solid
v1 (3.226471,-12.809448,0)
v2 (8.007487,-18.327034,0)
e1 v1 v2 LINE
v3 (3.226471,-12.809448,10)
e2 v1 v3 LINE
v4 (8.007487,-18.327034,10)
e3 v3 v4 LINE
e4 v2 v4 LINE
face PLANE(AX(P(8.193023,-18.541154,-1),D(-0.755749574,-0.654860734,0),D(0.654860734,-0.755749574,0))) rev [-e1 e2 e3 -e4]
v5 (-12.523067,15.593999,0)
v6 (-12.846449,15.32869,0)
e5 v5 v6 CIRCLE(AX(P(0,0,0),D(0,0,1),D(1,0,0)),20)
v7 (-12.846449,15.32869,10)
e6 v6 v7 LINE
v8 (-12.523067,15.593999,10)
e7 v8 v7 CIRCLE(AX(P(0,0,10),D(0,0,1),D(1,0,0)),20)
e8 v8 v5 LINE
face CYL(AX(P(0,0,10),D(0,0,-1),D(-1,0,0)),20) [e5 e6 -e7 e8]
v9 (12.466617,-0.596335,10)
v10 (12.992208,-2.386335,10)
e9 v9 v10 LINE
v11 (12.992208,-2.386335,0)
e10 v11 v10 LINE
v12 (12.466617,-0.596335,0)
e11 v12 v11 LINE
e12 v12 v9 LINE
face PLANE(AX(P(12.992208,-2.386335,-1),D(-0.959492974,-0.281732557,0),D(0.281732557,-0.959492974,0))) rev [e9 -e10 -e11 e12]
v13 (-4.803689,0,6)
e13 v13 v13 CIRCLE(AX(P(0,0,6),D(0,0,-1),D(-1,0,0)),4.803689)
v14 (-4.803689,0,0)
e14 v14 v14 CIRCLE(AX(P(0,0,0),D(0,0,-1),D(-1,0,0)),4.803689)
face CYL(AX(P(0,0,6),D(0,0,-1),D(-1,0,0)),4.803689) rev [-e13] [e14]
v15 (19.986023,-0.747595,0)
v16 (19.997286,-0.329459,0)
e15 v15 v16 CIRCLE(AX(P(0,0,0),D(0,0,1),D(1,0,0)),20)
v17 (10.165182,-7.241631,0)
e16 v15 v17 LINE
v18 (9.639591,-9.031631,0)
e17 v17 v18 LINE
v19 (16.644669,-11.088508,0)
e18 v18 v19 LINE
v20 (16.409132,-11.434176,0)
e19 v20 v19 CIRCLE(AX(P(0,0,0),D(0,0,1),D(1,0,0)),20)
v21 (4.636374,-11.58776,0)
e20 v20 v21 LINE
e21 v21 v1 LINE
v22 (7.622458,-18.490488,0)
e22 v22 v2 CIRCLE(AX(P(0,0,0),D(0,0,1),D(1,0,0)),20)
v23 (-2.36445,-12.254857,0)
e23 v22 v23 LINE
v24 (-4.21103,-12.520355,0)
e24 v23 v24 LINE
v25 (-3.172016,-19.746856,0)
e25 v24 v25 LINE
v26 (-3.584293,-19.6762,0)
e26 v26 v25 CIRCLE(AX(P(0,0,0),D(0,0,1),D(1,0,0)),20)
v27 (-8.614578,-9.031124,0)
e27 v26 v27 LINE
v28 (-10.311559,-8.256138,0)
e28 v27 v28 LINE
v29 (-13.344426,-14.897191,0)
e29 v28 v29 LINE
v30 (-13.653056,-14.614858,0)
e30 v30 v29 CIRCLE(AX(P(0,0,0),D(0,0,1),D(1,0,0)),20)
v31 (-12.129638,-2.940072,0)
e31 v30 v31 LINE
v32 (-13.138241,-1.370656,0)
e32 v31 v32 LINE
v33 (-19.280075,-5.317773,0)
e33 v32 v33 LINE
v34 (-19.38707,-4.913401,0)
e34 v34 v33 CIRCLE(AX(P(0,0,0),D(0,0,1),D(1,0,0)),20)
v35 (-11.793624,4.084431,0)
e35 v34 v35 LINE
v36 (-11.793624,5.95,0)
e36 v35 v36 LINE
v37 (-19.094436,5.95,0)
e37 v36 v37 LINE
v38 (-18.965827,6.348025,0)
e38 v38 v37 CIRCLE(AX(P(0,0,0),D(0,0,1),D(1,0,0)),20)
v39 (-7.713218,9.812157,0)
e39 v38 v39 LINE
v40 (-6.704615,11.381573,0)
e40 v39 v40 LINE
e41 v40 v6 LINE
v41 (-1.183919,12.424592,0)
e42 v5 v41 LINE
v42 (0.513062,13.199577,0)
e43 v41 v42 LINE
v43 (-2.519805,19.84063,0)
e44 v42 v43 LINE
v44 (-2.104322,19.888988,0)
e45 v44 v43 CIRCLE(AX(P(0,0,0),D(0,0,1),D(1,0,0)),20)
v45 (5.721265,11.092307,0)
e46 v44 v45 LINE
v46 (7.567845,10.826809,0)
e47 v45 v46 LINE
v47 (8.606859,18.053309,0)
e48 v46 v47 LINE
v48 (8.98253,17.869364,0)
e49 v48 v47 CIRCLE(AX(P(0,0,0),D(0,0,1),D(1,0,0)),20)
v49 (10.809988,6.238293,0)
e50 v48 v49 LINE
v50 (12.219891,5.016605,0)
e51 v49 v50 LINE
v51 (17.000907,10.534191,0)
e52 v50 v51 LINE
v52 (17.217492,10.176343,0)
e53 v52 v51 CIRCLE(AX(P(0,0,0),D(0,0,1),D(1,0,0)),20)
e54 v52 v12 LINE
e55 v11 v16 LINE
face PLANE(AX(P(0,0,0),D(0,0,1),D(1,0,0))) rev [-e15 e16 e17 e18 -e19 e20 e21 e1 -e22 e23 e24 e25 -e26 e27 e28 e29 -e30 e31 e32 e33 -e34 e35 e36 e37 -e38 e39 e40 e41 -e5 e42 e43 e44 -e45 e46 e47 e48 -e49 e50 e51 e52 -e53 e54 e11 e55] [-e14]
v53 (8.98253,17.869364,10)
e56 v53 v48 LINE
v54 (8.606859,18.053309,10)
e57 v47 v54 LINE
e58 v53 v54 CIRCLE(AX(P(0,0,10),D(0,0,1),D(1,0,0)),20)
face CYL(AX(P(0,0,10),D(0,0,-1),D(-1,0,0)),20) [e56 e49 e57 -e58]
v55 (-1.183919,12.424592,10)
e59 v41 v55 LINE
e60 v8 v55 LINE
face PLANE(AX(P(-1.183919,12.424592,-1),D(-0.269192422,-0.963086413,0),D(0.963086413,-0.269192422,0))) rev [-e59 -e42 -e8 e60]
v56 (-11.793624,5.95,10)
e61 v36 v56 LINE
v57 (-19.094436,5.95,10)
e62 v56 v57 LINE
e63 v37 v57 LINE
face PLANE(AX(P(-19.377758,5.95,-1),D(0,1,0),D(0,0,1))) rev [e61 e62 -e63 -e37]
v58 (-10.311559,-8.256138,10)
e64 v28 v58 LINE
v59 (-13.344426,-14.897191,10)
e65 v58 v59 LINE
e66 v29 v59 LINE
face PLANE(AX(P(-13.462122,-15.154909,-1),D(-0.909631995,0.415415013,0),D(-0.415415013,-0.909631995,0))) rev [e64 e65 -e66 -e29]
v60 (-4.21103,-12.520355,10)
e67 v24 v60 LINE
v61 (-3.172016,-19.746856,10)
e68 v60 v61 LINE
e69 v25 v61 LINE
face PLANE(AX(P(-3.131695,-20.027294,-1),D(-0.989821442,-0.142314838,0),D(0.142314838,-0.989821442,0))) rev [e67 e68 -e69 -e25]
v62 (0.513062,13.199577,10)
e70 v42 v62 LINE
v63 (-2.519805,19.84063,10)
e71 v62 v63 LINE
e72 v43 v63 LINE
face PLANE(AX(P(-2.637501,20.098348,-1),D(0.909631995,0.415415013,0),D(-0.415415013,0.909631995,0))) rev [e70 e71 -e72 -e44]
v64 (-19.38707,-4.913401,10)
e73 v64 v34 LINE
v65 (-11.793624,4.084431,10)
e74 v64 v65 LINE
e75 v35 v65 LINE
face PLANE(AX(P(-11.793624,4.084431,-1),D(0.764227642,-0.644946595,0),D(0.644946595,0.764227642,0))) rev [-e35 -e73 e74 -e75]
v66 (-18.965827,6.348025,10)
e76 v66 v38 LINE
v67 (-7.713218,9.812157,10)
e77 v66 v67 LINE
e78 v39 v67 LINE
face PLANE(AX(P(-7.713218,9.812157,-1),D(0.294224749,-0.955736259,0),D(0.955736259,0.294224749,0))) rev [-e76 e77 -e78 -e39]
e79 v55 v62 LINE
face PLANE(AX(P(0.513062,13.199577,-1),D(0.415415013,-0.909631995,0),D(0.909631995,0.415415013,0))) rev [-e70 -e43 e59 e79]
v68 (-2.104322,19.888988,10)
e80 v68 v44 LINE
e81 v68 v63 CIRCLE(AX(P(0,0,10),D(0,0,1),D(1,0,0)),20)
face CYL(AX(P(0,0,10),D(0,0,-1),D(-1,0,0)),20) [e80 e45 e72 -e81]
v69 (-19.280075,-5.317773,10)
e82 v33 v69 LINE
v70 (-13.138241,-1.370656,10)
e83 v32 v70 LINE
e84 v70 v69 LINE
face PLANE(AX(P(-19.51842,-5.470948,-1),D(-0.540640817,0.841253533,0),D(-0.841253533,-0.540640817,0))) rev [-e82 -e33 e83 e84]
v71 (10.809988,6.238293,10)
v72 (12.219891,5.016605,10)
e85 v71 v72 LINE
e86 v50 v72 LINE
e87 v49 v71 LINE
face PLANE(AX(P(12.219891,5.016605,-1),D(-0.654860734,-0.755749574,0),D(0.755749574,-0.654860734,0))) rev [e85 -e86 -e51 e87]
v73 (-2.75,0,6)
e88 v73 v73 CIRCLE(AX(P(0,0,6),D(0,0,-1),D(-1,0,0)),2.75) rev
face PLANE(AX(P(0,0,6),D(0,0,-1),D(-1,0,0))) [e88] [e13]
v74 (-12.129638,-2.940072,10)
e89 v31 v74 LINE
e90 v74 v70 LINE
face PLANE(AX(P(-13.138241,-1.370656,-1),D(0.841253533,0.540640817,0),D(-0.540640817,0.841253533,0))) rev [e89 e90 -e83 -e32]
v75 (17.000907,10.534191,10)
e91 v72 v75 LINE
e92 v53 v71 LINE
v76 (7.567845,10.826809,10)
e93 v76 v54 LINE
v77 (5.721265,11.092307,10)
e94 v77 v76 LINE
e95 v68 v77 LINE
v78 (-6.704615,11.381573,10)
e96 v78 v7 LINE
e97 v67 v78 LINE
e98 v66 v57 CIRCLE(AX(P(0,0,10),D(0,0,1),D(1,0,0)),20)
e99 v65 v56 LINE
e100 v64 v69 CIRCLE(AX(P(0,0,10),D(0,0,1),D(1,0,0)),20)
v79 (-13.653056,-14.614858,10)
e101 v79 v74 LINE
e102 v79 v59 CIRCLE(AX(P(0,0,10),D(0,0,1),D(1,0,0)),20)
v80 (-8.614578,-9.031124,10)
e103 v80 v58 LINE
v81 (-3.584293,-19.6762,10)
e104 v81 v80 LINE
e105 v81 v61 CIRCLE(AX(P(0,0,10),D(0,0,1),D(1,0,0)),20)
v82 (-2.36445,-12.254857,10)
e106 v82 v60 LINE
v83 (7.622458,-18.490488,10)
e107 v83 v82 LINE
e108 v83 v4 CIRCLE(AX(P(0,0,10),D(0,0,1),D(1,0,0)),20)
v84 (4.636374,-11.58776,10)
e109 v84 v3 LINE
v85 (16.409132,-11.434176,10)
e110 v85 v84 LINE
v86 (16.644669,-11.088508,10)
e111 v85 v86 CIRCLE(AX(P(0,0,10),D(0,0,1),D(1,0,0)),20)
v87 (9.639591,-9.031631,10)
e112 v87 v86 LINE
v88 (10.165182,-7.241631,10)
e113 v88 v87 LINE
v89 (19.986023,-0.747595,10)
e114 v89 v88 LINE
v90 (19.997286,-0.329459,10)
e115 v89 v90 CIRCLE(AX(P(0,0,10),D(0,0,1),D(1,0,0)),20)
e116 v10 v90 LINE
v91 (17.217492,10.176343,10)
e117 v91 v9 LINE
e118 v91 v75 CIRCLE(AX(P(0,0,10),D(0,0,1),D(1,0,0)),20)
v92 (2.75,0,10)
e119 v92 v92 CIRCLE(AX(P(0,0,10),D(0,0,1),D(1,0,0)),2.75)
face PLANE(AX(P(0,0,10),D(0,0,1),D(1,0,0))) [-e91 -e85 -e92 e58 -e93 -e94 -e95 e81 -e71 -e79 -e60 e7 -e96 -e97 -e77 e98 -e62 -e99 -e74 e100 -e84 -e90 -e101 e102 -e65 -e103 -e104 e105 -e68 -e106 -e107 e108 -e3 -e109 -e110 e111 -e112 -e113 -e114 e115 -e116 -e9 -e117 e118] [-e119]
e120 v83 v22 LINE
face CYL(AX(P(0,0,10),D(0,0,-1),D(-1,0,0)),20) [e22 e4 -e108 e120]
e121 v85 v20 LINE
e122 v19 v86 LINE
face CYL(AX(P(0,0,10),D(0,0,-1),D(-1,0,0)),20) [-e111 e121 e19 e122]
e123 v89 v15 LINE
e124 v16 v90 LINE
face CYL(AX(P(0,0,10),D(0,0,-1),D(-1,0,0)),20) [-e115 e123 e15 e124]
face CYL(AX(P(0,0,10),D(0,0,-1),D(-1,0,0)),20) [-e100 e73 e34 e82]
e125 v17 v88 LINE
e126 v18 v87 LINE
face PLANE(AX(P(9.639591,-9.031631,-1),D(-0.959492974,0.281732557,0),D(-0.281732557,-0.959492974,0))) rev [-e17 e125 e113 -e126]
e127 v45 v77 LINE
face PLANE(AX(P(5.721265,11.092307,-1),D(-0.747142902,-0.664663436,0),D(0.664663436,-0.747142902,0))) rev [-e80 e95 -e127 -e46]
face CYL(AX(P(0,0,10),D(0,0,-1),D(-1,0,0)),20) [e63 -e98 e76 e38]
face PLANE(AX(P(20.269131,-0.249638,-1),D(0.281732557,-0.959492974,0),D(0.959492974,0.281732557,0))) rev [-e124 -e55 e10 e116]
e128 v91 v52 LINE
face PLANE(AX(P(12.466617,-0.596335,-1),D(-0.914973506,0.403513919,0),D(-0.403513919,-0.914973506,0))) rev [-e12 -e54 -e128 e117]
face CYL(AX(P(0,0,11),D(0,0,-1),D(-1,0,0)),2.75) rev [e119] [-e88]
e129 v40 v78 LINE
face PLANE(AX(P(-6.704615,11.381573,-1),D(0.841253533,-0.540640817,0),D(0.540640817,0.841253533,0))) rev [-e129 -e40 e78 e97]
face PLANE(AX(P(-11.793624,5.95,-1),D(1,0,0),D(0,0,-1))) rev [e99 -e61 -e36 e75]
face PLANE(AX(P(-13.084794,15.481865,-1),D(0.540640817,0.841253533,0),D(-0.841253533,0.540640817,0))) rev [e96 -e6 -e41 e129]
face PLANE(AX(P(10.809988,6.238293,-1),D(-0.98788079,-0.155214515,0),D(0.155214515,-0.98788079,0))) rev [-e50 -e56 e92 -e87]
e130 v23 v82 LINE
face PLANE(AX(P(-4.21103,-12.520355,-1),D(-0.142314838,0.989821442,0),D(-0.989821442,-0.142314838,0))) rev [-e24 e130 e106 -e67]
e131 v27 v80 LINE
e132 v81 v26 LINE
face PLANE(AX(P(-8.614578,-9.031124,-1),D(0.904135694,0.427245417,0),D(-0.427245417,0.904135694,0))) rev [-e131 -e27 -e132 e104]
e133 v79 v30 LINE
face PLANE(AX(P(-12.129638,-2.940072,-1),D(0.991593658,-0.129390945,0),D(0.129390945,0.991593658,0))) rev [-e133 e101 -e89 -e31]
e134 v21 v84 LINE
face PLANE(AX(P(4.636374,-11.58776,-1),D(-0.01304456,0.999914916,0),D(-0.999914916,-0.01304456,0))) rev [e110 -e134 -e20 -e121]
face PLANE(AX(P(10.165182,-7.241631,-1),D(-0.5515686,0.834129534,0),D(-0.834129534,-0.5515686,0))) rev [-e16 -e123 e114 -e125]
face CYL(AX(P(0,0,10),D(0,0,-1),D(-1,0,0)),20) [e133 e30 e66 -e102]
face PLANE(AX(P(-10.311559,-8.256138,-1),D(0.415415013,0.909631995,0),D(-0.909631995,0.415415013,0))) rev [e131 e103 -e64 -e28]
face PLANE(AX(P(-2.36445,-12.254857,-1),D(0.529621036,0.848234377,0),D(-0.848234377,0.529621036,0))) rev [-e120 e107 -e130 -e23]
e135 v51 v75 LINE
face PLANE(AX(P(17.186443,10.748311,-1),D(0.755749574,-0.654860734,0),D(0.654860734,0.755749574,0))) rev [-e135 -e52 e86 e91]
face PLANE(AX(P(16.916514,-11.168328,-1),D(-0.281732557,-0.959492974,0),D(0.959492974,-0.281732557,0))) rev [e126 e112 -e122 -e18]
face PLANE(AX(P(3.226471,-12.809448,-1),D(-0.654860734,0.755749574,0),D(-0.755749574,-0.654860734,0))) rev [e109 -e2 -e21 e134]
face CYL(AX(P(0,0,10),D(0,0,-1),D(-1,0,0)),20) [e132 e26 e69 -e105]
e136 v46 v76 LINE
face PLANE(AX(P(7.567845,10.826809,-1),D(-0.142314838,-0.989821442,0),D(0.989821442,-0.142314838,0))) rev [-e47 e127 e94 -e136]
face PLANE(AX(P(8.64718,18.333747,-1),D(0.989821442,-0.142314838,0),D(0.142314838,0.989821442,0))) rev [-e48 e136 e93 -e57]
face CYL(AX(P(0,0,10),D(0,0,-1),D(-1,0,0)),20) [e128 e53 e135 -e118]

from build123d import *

# Parameters (mm, degrees)
SKETCH1_R           = 20
BOSS_EXTRUDE1_DEPTH = 10
CAVITY3_START       = 0.1
CAVITY3_DEPTH       = 9.9
CUT_EXTRUDE1_DEPTH  = 11
CIRPATTERN1_COUNT   = 11
SKETCH3_R           = 2.75
CUT_EXTRUDE2_DEPTH  = 11
SKETCH4_R           = 4.803689075
CUT_EXTRUDE3_DEPTH  = 6


# Read off the part's stored shape, not the designer's step: Cavity3
with BuildPart() as part:
    # Sketch1 → Boss-Extrude1 (new body)
    with BuildSketch(Plane.XY):
        Circle(SKETCH1_R)
    extrude(amount=BOSS_EXTRUDE1_DEPTH)

    # Cavity3 outline → Cavity3 (cut)
    with BuildSketch(Plane.XY.offset(CAVITY3_START)):
        with BuildLine():
            Line((-19.657828248, -3.683719394), (-12.793623997, 4.45))
            Line((-12.793623997, 4.45), (-12.793623997, 4.95))
            Line((-12.793623997, 4.95), (-19.377757868, 4.95))
            ThreePointArc((-19.377757868, 4.95), (-19.989485324, 0.648441592), (-19.657828248, -3.683719394))
        make_face()
    extrude(amount=CAVITY3_DEPTH, mode=Mode.SUBTRACT)

    # Sketch2 → Cut-Extrude1 (cut)
    with BuildSketch(Plane.XY.offset(10)):
        Polygon((-18.893600606, -4.32866599), (-20.741181365, -6.51795158), (-20.741181365, 5.95), (-19.377757868, 5.95), (-11.793623997, 5.95), (-11.793623997, 4.084431193), align=None)
    cut_extrude1 = extrude(amount=-CUT_EXTRUDE1_DEPTH, mode=Mode.SUBTRACT)

    # CirPattern1: Cut-Extrude1 ×11 about axis
    cirpattern1_axis = Axis((0, 0, 0), (0, 0, 1))
    for i in range(1, CIRPATTERN1_COUNT):
        add(cut_extrude1.rotate(cirpattern1_axis, i * 360 / CIRPATTERN1_COUNT), mode=Mode.SUBTRACT)

    # Sketch3 → Cut-Extrude2 (cut)
    with BuildSketch(Plane(origin=(0, 0, 0), x_dir=(-1, 0, 0), z_dir=(0, 0, -1))):
        Circle(SKETCH3_R)
    extrude(amount=-CUT_EXTRUDE2_DEPTH, mode=Mode.SUBTRACT)

    # Sketch4 → Cut-Extrude3 (cut)
    with BuildSketch(Plane(origin=(0, 0, 0), x_dir=(-1, 0, 0), z_dir=(0, 0, -1))):
        Circle(SKETCH4_R)
    extrude(amount=-CUT_EXTRUDE3_DEPTH, mode=Mode.SUBTRACT)


solid = part.part
